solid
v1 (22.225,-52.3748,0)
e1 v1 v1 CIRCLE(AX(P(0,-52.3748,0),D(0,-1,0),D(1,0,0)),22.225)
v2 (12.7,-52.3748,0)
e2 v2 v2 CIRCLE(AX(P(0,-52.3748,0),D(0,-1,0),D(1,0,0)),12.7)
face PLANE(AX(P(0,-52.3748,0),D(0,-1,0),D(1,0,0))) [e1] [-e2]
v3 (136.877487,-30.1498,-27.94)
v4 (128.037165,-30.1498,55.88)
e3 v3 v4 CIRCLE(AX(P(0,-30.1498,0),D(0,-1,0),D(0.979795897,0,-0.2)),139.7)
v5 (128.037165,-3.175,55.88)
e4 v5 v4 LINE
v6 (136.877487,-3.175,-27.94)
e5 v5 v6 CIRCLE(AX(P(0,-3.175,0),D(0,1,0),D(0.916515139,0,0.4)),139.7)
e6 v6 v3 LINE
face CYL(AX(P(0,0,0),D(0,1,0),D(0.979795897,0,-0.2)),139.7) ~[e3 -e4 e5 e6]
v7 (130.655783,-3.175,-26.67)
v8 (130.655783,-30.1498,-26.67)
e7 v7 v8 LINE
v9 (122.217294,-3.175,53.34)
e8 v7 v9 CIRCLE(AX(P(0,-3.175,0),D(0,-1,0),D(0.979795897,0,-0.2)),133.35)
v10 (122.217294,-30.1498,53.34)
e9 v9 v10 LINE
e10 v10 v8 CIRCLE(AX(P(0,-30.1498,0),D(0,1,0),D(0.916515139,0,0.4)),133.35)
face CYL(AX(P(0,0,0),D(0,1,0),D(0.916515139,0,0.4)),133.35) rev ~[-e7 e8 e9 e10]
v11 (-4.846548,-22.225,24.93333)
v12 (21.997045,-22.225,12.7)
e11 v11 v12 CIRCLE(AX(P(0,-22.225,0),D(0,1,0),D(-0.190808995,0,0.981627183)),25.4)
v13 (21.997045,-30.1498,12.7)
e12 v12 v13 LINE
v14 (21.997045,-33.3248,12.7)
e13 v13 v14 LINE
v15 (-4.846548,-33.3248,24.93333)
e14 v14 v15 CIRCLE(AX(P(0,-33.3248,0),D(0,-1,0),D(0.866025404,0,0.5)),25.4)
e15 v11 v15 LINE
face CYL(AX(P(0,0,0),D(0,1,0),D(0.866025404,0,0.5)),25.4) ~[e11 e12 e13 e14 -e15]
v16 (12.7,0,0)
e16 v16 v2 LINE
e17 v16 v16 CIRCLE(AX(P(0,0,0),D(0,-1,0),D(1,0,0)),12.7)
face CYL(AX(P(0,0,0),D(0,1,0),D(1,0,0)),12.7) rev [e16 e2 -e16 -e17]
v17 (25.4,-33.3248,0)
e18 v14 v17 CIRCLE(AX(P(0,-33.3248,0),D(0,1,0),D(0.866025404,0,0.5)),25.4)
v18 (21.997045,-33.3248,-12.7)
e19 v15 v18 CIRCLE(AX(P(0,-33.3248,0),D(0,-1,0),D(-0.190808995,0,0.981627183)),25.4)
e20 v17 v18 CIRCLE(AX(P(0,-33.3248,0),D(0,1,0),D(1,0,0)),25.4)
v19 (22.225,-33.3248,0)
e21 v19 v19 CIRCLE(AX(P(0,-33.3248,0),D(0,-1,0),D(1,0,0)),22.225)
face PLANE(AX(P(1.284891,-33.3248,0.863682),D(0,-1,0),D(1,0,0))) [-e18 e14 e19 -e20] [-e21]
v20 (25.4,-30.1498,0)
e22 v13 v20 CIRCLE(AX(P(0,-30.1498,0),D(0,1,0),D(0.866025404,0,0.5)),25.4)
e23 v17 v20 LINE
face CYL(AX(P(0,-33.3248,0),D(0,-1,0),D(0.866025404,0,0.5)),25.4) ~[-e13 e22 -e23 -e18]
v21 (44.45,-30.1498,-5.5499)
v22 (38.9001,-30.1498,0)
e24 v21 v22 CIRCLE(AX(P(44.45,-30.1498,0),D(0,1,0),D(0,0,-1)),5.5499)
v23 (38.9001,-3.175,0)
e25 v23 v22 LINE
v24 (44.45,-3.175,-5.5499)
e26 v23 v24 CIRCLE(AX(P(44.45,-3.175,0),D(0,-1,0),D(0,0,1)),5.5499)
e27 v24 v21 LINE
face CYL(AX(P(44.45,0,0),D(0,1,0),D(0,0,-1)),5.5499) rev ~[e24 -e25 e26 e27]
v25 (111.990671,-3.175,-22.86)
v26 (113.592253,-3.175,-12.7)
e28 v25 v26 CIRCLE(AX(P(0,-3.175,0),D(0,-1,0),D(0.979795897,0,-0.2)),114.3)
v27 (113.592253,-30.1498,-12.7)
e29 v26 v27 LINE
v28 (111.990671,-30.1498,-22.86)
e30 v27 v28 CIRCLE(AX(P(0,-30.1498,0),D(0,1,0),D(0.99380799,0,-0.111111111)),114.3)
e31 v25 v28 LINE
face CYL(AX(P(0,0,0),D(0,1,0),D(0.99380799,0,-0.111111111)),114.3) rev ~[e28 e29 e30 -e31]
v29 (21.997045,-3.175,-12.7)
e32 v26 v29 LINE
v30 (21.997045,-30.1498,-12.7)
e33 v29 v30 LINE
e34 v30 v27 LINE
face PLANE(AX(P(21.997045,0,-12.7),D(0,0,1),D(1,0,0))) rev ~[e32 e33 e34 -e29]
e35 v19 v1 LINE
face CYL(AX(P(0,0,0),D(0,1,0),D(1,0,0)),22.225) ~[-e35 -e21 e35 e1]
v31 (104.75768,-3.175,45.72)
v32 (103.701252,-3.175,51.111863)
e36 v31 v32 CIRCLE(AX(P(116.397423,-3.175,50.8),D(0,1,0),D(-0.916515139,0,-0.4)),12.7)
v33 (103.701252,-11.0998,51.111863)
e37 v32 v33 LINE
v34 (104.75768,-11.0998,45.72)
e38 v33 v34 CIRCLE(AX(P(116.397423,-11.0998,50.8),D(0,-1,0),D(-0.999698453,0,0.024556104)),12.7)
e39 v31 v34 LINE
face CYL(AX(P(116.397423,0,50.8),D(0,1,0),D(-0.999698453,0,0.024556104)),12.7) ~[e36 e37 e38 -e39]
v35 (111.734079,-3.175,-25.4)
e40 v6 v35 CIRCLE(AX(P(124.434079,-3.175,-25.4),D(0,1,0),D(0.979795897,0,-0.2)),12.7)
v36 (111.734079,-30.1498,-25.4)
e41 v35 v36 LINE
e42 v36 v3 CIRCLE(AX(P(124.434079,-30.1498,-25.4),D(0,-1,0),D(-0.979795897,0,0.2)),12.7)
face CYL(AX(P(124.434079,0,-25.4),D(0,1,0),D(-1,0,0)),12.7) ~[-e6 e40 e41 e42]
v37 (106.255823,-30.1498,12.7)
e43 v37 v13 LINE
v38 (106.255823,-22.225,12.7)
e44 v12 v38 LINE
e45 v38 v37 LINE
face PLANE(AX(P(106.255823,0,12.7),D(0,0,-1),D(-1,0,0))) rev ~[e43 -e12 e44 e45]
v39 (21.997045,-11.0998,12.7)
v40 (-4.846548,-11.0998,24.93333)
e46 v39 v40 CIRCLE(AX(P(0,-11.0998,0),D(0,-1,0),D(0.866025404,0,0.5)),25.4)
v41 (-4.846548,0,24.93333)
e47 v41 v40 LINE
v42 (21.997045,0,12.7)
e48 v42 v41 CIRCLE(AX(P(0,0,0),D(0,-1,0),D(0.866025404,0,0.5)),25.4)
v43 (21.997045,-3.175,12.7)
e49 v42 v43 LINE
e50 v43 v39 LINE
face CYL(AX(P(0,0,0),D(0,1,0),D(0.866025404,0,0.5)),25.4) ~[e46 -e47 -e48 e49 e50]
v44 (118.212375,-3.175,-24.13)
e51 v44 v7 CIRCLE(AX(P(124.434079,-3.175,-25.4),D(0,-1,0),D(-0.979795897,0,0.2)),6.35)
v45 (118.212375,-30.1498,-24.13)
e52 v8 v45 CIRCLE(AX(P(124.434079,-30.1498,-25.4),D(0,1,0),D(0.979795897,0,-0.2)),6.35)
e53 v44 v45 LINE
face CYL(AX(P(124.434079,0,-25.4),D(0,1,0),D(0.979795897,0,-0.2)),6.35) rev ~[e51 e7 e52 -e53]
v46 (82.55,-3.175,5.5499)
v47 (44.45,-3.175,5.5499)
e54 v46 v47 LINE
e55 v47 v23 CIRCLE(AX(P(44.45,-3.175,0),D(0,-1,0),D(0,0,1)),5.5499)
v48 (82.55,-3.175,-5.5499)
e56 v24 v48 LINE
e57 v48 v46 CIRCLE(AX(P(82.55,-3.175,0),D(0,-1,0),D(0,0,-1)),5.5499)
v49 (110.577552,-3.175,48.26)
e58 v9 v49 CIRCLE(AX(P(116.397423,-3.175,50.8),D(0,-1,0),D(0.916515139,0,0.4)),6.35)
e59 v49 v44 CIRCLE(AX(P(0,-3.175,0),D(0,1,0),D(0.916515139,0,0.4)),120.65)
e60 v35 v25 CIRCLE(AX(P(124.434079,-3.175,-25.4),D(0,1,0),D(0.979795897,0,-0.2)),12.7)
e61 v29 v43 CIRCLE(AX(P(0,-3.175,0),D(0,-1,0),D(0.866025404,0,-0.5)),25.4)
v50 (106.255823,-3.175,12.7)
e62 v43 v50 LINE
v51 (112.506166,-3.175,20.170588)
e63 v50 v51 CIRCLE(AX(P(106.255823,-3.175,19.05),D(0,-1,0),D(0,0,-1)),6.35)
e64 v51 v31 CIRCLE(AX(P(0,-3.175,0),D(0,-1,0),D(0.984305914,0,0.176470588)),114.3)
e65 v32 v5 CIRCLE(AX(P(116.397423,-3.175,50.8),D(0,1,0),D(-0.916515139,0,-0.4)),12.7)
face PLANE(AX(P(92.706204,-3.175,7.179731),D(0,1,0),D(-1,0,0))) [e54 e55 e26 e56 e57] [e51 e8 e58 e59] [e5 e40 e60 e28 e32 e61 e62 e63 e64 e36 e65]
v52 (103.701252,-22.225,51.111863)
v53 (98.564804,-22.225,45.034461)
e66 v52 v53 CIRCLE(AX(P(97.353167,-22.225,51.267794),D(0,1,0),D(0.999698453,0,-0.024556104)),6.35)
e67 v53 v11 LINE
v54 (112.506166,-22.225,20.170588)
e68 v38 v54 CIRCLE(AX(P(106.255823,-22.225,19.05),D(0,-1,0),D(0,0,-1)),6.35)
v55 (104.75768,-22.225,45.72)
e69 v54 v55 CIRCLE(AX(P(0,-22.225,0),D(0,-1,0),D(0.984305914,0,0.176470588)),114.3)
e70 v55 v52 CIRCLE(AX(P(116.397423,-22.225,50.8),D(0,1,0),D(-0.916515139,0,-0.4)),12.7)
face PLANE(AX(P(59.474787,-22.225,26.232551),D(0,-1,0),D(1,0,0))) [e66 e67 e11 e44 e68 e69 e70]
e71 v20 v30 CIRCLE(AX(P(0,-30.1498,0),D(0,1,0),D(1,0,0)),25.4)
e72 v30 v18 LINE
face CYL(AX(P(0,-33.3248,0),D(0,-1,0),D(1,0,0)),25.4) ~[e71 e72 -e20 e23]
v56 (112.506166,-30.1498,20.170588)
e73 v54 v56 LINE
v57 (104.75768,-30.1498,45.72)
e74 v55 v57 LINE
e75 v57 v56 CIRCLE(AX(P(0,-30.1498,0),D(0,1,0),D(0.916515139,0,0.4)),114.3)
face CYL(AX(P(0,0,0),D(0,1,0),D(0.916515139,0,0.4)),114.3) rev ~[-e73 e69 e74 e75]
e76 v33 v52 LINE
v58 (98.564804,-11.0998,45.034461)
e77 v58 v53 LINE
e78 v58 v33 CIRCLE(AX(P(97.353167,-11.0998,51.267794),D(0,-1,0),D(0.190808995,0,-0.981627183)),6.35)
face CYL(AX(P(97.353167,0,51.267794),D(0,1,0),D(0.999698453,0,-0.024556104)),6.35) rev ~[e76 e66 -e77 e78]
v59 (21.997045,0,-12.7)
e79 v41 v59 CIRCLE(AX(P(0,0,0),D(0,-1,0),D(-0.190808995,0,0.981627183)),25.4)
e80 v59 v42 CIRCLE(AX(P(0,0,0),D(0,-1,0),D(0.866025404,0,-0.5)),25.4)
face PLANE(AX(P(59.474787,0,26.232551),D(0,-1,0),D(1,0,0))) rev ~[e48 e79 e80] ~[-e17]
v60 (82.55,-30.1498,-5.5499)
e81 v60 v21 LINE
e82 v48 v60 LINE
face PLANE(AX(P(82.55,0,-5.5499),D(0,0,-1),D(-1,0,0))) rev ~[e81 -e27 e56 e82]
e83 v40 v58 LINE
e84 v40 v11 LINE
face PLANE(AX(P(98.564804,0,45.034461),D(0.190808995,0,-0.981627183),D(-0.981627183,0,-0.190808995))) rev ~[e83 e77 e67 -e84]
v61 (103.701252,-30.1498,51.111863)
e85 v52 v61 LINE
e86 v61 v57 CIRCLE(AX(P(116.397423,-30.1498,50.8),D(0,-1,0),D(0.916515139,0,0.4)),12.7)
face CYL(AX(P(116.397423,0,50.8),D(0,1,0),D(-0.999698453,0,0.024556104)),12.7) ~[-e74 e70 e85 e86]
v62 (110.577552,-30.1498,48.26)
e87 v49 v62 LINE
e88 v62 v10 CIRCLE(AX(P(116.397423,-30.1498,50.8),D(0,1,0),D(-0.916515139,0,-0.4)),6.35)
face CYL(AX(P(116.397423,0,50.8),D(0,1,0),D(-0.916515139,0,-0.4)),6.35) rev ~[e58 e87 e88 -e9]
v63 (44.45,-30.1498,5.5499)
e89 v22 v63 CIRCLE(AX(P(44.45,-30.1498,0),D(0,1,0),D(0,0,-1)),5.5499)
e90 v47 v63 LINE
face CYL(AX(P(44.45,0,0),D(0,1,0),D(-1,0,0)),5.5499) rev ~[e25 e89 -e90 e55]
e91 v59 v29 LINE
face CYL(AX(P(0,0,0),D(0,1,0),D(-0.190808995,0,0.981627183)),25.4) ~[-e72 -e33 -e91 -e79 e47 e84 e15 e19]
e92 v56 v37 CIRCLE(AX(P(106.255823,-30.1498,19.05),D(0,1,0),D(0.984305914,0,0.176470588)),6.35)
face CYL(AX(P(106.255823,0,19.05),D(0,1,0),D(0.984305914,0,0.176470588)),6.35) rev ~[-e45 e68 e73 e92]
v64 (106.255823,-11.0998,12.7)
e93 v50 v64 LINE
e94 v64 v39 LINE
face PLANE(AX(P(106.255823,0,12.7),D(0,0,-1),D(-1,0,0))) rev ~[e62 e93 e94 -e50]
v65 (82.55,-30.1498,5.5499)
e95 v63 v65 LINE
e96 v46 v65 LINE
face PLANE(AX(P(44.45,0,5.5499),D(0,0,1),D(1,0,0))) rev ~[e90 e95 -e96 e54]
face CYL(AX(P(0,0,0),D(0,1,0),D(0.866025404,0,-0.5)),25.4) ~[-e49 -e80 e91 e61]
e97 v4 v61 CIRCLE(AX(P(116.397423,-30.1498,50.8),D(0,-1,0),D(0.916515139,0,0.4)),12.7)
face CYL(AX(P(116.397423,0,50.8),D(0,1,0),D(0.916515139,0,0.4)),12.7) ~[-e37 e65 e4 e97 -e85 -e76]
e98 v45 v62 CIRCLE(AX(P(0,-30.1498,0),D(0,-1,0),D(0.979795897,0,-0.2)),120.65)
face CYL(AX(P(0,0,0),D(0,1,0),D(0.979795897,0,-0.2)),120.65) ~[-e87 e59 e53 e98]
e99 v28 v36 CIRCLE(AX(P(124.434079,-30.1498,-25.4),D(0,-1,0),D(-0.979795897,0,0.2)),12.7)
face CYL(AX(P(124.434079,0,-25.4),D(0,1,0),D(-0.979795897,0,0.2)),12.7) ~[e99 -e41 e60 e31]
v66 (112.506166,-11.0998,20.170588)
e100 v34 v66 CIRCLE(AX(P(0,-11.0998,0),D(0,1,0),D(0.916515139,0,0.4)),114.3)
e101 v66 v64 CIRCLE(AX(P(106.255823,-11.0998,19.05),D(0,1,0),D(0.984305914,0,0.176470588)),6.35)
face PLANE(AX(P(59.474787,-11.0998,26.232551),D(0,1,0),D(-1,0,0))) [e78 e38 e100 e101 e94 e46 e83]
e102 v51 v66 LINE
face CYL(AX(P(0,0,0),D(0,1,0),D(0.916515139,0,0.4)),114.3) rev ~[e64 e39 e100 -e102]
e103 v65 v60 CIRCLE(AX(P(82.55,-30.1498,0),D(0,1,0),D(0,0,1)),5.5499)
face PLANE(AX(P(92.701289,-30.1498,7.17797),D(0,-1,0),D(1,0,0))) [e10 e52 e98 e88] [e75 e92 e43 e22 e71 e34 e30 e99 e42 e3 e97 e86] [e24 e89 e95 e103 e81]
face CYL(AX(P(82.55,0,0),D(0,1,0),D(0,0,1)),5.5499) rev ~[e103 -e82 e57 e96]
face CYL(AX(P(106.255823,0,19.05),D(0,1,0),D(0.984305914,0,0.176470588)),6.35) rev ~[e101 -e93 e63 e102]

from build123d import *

# Parameters (mm, degrees)
F0_R     = 22.225
F1_DEPTH = 33.3248
F0_R_2   = 12.7
F2_DEPTH = 52.3748
F4_DEPTH = 3.175
F6_DEPTH = 3.175
F7_DEPTH = 22.225
F9_DEPTH = 11.0998


with BuildPart() as f1:
    # F0 (on Front) → F1 (new body)
    with BuildSketch(Plane.XZ):
        with BuildLine():
            ThreePointArc((21.9970452561, -12.7), (24.5345159877, -6.5740037456), (25.4, 0))
            ThreePointArc((25.4, 0), (24.5345159877, 6.5740037456), (21.9970452561, 12.7))
            ThreePointArc((21.9970452561, 12.7), (10.5332083635, 23.1130162803), (-4.8465484826, 24.9333304596))
            ThreePointArc((-4.8465484826, 24.9333304596), (-20.6785341663, -14.7498550751), (21.9970452561, -12.7))
        make_face()
        Circle(F0_R, mode=Mode.SUBTRACT)
        with BuildLine():
            ThreePointArc((21.9970452561, 12.7), (24.5345159877, 6.5740037456), (25.4, 0))
            ThreePointArc((25.4, 0), (24.5345159877, -6.5740037456), (21.9970452561, -12.7))
            Line((21.9970452561, -12.7), (44.45, -12.7))
            Line((44.45, -12.7), (113.592253257, -12.7))
            ThreePointArc((113.592253257, -12.7), (114.2376587708, 3.7745620369), (112.506165921, 20.1705882353))
            ThreePointArc((112.506165921, 20.1705882353), (111.126051049, 14.9752751807), (106.2558233698, 12.7))
            Line((106.2558233698, 12.7), (44.45, 12.7))
            Line((44.45, 12.7), (21.9970452561, 12.7))
        make_face()
        with BuildLine():
            ThreePointArc((44.45, -5.5499), (40.5256280751, -3.9243719249), (38.9001, 0))
            ThreePointArc((38.9001, 0), (40.5256280751, 3.9243719249), (44.45, 5.5499))
            Line((44.45, 5.5499), (82.55, 5.5499))
            ThreePointArc((82.55, 5.5499), (88.0999, 0), (82.55, -5.5499))
            Line((82.55, -5.5499), (44.45, -5.5499))
        make_face(mode=Mode.SUBTRACT)
        with BuildLine():
            ThreePointArc((112.506165921, 20.1705882353), (114.2376587708, 3.7745620369), (113.592253257, -12.7))
            ThreePointArc((113.592253257, -12.7), (112.9058029226, -17.7980242274), (111.99067104, -22.86))
            ThreePointArc((111.99067104, -22.86), (111.7983897902, -24.1235361825), (111.7340789334, -25.4))
            ThreePointArc((111.7340789334, -25.4), (123.1576151159, -38.0356891432), (136.8774868267, -27.94))
            ThreePointArc((136.8774868267, -27.94), (138.9294471202, 14.6526012321), (128.0371649171, 55.88))
            ThreePointArc((128.0371649171, 55.88), (113.9555393972, 63.2630335862), (103.7012522936, 51.1118625227))
            ThreePointArc((103.7012522936, 51.1118625227), (103.9343890657, 48.3581167453), (104.7576803867, 45.72))
            ThreePointArc((104.7576803867, 45.72), (109.380472839, 33.1723101625), (112.506165921, 20.1705882353))
        make_face()
        with BuildLine():
            ThreePointArc((130.6557828801, -26.67), (123.1640789334, -31.6217039467), (118.2123749867, -24.13))
            ThreePointArc((118.2123749867, -24.13), (119.9845225129, 12.6545192459), (110.5775515193, 48.26))
            ThreePointArc((110.5775515193, 48.26), (113.8574226519, 56.6198711326), (122.2172937845, 53.34))
            ThreePointArc((122.2172937845, 53.34), (132.6144722511, 13.9865739034), (130.6557828801, -26.67))
        make_face(mode=Mode.SUBTRACT)
    extrude(amount=F1_DEPTH)

    # F0 (on Front) → F2 (join)
    with BuildSketch(Plane.XZ):
        Circle(F0_R)
        Circle(F0_R_2, mode=Mode.SUBTRACT)
    extrude(amount=F2_DEPTH)

    # F3 (on face) → F4 (cut)
    with BuildSketch(Plane.XZ.offset(33.3248)):
        with BuildLine():
            ThreePointArc((21.9970452561, 12.7), (24.5345159877, 6.5740037456), (25.4, 0))
            ThreePointArc((25.4, 0), (24.5345159877, -6.5740037456), (21.9970452561, -12.7))
            Line((21.9970452561, -12.7), (113.592253257, -12.7))
            ThreePointArc((113.592253257, -12.7), (112.9058029226, -17.7980242274), (111.99067104, -22.86))
            ThreePointArc((111.99067104, -22.86), (121.8940789334, -37.8434078933), (136.8774868267, -27.94))
            ThreePointArc((136.8774868267, -27.94), (138.9294471202, 14.6526012321), (128.0371649171, 55.88))
            ThreePointArc((128.0371649171, 55.88), (111.3174226519, 62.4397422652), (104.7576803867, 45.72))
            ThreePointArc((104.7576803867, 45.72), (109.380472839, 33.1723101625), (112.506165921, 20.1705882353))
            ThreePointArc((112.506165921, 20.1705882353), (111.126051049, 14.9752751807), (106.2558233698, 12.7))
            Line((106.2558233698, 12.7), (21.9970452561, 12.7))
        make_face()
        with BuildLine():
            Line((82.55, -5.5499), (44.45, -5.5499))
            ThreePointArc((44.45, -5.5499), (38.9001, 0), (44.45, 5.5499))
            Line((44.45, 5.5499), (82.55, 5.5499))
            ThreePointArc((82.55, 5.5499), (88.0999, 0), (82.55, -5.5499))
        make_face(mode=Mode.SUBTRACT)
        with BuildLine():
            ThreePointArc((130.6557828801, -26.67), (123.1640789334, -31.6217039467), (118.2123749867, -24.13))
            ThreePointArc((118.2123749867, -24.13), (119.9845225129, 12.6545192459), (110.5775515193, 48.26))
            ThreePointArc((110.5775515193, 48.26), (113.8574226519, 56.6198711326), (122.2172937845, 53.34))
            ThreePointArc((122.2172937845, 53.34), (132.6144722511, 13.9865739034), (130.6557828801, -26.67))
        make_face(mode=Mode.SUBTRACT)
    extrude(amount=-F4_DEPTH, mode=Mode.SUBTRACT)

    # F5 (on face) → F6 (cut)
    with BuildSketch(Plane(origin=(0, 0, 0), x_dir=(-1, 0, 0), z_dir=(0, 1, 0))):
        with BuildLine():
            ThreePointArc((-21.9970452561, -12.7), (-25.4, 0), (-21.9970452561, 12.7))
            Line((-21.9970452561, 12.7), (-106.2558233698, 12.7))
            ThreePointArc((-106.2558233698, 12.7), (-111.126051049, 14.9752751807), (-112.506165921, 20.1705882353))
            ThreePointArc((-112.506165921, 20.1705882353), (-109.380472839, 33.1723101625), (-104.7576803867, 45.72))
            ThreePointArc((-104.7576803867, 45.72), (-111.3174226519, 62.4397422652), (-128.0371649171, 55.88))
            ThreePointArc((-128.0371649171, 55.88), (-138.9294471202, 14.6526012321), (-136.8774868267, -27.94))
            ThreePointArc((-136.8774868267, -27.94), (-121.8940789334, -37.8434078933), (-111.99067104, -22.86))
            ThreePointArc((-111.99067104, -22.86), (-112.9058029226, -17.7980242274), (-113.592253257, -12.7))
            Line((-113.592253257, -12.7), (-21.9970452561, -12.7))
        make_face()
        with BuildLine():
            ThreePointArc((-122.2172937845, 53.34), (-113.8574226519, 56.6198711326), (-110.5775515193, 48.26))
            ThreePointArc((-110.5775515193, 48.26), (-119.9845225129, 12.6545192459), (-118.2123749867, -24.13))
            ThreePointArc((-118.2123749867, -24.13), (-123.1640789334, -31.6217039467), (-130.6557828801, -26.67))
            ThreePointArc((-130.6557828801, -26.67), (-132.6144722511, 13.9865739034), (-122.2172937845, 53.34))
        make_face(mode=Mode.SUBTRACT)
        with BuildLine():
            Line((-82.55, 5.5499), (-44.45, 5.5499))
            ThreePointArc((-44.45, 5.5499), (-38.9001, 0), (-44.45, -5.5499))
            Line((-44.45, -5.5499), (-82.55, -5.5499))
            ThreePointArc((-82.55, -5.5499), (-88.0999, 0), (-82.55, 5.5499))
        make_face(mode=Mode.SUBTRACT)
    extrude(amount=-F6_DEPTH, mode=Mode.SUBTRACT)

    # F0 (on Front) → F7 (join)
    with BuildSketch(Plane.XZ):
        with BuildLine():
            ThreePointArc((-4.8465484826, 24.9333304596), (10.5332083635, 23.1130162803), (21.9970452561, 12.7))
            Line((21.9970452561, 12.7), (44.45, 12.7))
            Line((44.45, 12.7), (106.2558233698, 12.7))
            ThreePointArc((106.2558233698, 12.7), (111.126051049, 14.9752751807), (112.506165921, 20.1705882353))
            ThreePointArc((112.506165921, 20.1705882353), (109.380472839, 33.1723101625), (104.7576803867, 45.72))
            ThreePointArc((104.7576803867, 45.72), (103.9343890657, 48.3581167453), (103.7012522936, 51.1118625227))
            ThreePointArc((103.7012522936, 51.1118625227), (102.2030178457, 47.1688368577), (98.5648042351, 45.0344611692))
            Line((98.5648042351, 45.0344611692), (-4.8465484826, 24.9333304596))
        make_face()
    extrude(amount=F7_DEPTH)

    # F8 (on face) → F9 (cut)
    with BuildSketch(Plane(origin=(0, 0, 0), x_dir=(-1, 0, 0), z_dir=(0, 1, 0))):
        with BuildLine():
            ThreePointArc((-21.9970452561, 12.7), (-10.5332083635, 23.1130162803), (4.8465484826, 24.9333304596))
            Line((4.8465484826, 24.9333304596), (-98.5648042351, 45.0344611692))
            ThreePointArc((-98.5648042351, 45.0344611692), (-102.2030178457, 47.1688368577), (-103.7012522936, 51.1118625227))
            ThreePointArc((-103.7012522936, 51.1118625227), (-103.9343890657, 48.3581167453), (-104.7576803867, 45.72))
            ThreePointArc((-104.7576803867, 45.72), (-109.380472839, 33.1723101625), (-112.506165921, 20.1705882353))
            ThreePointArc((-112.506165921, 20.1705882353), (-111.126051049, 14.9752751807), (-106.2558233698, 12.7))
            Line((-106.2558233698, 12.7), (-21.9970452561, 12.7))
        make_face()
    extrude(amount=-F9_DEPTH, mode=Mode.SUBTRACT)


solid = f1.part
